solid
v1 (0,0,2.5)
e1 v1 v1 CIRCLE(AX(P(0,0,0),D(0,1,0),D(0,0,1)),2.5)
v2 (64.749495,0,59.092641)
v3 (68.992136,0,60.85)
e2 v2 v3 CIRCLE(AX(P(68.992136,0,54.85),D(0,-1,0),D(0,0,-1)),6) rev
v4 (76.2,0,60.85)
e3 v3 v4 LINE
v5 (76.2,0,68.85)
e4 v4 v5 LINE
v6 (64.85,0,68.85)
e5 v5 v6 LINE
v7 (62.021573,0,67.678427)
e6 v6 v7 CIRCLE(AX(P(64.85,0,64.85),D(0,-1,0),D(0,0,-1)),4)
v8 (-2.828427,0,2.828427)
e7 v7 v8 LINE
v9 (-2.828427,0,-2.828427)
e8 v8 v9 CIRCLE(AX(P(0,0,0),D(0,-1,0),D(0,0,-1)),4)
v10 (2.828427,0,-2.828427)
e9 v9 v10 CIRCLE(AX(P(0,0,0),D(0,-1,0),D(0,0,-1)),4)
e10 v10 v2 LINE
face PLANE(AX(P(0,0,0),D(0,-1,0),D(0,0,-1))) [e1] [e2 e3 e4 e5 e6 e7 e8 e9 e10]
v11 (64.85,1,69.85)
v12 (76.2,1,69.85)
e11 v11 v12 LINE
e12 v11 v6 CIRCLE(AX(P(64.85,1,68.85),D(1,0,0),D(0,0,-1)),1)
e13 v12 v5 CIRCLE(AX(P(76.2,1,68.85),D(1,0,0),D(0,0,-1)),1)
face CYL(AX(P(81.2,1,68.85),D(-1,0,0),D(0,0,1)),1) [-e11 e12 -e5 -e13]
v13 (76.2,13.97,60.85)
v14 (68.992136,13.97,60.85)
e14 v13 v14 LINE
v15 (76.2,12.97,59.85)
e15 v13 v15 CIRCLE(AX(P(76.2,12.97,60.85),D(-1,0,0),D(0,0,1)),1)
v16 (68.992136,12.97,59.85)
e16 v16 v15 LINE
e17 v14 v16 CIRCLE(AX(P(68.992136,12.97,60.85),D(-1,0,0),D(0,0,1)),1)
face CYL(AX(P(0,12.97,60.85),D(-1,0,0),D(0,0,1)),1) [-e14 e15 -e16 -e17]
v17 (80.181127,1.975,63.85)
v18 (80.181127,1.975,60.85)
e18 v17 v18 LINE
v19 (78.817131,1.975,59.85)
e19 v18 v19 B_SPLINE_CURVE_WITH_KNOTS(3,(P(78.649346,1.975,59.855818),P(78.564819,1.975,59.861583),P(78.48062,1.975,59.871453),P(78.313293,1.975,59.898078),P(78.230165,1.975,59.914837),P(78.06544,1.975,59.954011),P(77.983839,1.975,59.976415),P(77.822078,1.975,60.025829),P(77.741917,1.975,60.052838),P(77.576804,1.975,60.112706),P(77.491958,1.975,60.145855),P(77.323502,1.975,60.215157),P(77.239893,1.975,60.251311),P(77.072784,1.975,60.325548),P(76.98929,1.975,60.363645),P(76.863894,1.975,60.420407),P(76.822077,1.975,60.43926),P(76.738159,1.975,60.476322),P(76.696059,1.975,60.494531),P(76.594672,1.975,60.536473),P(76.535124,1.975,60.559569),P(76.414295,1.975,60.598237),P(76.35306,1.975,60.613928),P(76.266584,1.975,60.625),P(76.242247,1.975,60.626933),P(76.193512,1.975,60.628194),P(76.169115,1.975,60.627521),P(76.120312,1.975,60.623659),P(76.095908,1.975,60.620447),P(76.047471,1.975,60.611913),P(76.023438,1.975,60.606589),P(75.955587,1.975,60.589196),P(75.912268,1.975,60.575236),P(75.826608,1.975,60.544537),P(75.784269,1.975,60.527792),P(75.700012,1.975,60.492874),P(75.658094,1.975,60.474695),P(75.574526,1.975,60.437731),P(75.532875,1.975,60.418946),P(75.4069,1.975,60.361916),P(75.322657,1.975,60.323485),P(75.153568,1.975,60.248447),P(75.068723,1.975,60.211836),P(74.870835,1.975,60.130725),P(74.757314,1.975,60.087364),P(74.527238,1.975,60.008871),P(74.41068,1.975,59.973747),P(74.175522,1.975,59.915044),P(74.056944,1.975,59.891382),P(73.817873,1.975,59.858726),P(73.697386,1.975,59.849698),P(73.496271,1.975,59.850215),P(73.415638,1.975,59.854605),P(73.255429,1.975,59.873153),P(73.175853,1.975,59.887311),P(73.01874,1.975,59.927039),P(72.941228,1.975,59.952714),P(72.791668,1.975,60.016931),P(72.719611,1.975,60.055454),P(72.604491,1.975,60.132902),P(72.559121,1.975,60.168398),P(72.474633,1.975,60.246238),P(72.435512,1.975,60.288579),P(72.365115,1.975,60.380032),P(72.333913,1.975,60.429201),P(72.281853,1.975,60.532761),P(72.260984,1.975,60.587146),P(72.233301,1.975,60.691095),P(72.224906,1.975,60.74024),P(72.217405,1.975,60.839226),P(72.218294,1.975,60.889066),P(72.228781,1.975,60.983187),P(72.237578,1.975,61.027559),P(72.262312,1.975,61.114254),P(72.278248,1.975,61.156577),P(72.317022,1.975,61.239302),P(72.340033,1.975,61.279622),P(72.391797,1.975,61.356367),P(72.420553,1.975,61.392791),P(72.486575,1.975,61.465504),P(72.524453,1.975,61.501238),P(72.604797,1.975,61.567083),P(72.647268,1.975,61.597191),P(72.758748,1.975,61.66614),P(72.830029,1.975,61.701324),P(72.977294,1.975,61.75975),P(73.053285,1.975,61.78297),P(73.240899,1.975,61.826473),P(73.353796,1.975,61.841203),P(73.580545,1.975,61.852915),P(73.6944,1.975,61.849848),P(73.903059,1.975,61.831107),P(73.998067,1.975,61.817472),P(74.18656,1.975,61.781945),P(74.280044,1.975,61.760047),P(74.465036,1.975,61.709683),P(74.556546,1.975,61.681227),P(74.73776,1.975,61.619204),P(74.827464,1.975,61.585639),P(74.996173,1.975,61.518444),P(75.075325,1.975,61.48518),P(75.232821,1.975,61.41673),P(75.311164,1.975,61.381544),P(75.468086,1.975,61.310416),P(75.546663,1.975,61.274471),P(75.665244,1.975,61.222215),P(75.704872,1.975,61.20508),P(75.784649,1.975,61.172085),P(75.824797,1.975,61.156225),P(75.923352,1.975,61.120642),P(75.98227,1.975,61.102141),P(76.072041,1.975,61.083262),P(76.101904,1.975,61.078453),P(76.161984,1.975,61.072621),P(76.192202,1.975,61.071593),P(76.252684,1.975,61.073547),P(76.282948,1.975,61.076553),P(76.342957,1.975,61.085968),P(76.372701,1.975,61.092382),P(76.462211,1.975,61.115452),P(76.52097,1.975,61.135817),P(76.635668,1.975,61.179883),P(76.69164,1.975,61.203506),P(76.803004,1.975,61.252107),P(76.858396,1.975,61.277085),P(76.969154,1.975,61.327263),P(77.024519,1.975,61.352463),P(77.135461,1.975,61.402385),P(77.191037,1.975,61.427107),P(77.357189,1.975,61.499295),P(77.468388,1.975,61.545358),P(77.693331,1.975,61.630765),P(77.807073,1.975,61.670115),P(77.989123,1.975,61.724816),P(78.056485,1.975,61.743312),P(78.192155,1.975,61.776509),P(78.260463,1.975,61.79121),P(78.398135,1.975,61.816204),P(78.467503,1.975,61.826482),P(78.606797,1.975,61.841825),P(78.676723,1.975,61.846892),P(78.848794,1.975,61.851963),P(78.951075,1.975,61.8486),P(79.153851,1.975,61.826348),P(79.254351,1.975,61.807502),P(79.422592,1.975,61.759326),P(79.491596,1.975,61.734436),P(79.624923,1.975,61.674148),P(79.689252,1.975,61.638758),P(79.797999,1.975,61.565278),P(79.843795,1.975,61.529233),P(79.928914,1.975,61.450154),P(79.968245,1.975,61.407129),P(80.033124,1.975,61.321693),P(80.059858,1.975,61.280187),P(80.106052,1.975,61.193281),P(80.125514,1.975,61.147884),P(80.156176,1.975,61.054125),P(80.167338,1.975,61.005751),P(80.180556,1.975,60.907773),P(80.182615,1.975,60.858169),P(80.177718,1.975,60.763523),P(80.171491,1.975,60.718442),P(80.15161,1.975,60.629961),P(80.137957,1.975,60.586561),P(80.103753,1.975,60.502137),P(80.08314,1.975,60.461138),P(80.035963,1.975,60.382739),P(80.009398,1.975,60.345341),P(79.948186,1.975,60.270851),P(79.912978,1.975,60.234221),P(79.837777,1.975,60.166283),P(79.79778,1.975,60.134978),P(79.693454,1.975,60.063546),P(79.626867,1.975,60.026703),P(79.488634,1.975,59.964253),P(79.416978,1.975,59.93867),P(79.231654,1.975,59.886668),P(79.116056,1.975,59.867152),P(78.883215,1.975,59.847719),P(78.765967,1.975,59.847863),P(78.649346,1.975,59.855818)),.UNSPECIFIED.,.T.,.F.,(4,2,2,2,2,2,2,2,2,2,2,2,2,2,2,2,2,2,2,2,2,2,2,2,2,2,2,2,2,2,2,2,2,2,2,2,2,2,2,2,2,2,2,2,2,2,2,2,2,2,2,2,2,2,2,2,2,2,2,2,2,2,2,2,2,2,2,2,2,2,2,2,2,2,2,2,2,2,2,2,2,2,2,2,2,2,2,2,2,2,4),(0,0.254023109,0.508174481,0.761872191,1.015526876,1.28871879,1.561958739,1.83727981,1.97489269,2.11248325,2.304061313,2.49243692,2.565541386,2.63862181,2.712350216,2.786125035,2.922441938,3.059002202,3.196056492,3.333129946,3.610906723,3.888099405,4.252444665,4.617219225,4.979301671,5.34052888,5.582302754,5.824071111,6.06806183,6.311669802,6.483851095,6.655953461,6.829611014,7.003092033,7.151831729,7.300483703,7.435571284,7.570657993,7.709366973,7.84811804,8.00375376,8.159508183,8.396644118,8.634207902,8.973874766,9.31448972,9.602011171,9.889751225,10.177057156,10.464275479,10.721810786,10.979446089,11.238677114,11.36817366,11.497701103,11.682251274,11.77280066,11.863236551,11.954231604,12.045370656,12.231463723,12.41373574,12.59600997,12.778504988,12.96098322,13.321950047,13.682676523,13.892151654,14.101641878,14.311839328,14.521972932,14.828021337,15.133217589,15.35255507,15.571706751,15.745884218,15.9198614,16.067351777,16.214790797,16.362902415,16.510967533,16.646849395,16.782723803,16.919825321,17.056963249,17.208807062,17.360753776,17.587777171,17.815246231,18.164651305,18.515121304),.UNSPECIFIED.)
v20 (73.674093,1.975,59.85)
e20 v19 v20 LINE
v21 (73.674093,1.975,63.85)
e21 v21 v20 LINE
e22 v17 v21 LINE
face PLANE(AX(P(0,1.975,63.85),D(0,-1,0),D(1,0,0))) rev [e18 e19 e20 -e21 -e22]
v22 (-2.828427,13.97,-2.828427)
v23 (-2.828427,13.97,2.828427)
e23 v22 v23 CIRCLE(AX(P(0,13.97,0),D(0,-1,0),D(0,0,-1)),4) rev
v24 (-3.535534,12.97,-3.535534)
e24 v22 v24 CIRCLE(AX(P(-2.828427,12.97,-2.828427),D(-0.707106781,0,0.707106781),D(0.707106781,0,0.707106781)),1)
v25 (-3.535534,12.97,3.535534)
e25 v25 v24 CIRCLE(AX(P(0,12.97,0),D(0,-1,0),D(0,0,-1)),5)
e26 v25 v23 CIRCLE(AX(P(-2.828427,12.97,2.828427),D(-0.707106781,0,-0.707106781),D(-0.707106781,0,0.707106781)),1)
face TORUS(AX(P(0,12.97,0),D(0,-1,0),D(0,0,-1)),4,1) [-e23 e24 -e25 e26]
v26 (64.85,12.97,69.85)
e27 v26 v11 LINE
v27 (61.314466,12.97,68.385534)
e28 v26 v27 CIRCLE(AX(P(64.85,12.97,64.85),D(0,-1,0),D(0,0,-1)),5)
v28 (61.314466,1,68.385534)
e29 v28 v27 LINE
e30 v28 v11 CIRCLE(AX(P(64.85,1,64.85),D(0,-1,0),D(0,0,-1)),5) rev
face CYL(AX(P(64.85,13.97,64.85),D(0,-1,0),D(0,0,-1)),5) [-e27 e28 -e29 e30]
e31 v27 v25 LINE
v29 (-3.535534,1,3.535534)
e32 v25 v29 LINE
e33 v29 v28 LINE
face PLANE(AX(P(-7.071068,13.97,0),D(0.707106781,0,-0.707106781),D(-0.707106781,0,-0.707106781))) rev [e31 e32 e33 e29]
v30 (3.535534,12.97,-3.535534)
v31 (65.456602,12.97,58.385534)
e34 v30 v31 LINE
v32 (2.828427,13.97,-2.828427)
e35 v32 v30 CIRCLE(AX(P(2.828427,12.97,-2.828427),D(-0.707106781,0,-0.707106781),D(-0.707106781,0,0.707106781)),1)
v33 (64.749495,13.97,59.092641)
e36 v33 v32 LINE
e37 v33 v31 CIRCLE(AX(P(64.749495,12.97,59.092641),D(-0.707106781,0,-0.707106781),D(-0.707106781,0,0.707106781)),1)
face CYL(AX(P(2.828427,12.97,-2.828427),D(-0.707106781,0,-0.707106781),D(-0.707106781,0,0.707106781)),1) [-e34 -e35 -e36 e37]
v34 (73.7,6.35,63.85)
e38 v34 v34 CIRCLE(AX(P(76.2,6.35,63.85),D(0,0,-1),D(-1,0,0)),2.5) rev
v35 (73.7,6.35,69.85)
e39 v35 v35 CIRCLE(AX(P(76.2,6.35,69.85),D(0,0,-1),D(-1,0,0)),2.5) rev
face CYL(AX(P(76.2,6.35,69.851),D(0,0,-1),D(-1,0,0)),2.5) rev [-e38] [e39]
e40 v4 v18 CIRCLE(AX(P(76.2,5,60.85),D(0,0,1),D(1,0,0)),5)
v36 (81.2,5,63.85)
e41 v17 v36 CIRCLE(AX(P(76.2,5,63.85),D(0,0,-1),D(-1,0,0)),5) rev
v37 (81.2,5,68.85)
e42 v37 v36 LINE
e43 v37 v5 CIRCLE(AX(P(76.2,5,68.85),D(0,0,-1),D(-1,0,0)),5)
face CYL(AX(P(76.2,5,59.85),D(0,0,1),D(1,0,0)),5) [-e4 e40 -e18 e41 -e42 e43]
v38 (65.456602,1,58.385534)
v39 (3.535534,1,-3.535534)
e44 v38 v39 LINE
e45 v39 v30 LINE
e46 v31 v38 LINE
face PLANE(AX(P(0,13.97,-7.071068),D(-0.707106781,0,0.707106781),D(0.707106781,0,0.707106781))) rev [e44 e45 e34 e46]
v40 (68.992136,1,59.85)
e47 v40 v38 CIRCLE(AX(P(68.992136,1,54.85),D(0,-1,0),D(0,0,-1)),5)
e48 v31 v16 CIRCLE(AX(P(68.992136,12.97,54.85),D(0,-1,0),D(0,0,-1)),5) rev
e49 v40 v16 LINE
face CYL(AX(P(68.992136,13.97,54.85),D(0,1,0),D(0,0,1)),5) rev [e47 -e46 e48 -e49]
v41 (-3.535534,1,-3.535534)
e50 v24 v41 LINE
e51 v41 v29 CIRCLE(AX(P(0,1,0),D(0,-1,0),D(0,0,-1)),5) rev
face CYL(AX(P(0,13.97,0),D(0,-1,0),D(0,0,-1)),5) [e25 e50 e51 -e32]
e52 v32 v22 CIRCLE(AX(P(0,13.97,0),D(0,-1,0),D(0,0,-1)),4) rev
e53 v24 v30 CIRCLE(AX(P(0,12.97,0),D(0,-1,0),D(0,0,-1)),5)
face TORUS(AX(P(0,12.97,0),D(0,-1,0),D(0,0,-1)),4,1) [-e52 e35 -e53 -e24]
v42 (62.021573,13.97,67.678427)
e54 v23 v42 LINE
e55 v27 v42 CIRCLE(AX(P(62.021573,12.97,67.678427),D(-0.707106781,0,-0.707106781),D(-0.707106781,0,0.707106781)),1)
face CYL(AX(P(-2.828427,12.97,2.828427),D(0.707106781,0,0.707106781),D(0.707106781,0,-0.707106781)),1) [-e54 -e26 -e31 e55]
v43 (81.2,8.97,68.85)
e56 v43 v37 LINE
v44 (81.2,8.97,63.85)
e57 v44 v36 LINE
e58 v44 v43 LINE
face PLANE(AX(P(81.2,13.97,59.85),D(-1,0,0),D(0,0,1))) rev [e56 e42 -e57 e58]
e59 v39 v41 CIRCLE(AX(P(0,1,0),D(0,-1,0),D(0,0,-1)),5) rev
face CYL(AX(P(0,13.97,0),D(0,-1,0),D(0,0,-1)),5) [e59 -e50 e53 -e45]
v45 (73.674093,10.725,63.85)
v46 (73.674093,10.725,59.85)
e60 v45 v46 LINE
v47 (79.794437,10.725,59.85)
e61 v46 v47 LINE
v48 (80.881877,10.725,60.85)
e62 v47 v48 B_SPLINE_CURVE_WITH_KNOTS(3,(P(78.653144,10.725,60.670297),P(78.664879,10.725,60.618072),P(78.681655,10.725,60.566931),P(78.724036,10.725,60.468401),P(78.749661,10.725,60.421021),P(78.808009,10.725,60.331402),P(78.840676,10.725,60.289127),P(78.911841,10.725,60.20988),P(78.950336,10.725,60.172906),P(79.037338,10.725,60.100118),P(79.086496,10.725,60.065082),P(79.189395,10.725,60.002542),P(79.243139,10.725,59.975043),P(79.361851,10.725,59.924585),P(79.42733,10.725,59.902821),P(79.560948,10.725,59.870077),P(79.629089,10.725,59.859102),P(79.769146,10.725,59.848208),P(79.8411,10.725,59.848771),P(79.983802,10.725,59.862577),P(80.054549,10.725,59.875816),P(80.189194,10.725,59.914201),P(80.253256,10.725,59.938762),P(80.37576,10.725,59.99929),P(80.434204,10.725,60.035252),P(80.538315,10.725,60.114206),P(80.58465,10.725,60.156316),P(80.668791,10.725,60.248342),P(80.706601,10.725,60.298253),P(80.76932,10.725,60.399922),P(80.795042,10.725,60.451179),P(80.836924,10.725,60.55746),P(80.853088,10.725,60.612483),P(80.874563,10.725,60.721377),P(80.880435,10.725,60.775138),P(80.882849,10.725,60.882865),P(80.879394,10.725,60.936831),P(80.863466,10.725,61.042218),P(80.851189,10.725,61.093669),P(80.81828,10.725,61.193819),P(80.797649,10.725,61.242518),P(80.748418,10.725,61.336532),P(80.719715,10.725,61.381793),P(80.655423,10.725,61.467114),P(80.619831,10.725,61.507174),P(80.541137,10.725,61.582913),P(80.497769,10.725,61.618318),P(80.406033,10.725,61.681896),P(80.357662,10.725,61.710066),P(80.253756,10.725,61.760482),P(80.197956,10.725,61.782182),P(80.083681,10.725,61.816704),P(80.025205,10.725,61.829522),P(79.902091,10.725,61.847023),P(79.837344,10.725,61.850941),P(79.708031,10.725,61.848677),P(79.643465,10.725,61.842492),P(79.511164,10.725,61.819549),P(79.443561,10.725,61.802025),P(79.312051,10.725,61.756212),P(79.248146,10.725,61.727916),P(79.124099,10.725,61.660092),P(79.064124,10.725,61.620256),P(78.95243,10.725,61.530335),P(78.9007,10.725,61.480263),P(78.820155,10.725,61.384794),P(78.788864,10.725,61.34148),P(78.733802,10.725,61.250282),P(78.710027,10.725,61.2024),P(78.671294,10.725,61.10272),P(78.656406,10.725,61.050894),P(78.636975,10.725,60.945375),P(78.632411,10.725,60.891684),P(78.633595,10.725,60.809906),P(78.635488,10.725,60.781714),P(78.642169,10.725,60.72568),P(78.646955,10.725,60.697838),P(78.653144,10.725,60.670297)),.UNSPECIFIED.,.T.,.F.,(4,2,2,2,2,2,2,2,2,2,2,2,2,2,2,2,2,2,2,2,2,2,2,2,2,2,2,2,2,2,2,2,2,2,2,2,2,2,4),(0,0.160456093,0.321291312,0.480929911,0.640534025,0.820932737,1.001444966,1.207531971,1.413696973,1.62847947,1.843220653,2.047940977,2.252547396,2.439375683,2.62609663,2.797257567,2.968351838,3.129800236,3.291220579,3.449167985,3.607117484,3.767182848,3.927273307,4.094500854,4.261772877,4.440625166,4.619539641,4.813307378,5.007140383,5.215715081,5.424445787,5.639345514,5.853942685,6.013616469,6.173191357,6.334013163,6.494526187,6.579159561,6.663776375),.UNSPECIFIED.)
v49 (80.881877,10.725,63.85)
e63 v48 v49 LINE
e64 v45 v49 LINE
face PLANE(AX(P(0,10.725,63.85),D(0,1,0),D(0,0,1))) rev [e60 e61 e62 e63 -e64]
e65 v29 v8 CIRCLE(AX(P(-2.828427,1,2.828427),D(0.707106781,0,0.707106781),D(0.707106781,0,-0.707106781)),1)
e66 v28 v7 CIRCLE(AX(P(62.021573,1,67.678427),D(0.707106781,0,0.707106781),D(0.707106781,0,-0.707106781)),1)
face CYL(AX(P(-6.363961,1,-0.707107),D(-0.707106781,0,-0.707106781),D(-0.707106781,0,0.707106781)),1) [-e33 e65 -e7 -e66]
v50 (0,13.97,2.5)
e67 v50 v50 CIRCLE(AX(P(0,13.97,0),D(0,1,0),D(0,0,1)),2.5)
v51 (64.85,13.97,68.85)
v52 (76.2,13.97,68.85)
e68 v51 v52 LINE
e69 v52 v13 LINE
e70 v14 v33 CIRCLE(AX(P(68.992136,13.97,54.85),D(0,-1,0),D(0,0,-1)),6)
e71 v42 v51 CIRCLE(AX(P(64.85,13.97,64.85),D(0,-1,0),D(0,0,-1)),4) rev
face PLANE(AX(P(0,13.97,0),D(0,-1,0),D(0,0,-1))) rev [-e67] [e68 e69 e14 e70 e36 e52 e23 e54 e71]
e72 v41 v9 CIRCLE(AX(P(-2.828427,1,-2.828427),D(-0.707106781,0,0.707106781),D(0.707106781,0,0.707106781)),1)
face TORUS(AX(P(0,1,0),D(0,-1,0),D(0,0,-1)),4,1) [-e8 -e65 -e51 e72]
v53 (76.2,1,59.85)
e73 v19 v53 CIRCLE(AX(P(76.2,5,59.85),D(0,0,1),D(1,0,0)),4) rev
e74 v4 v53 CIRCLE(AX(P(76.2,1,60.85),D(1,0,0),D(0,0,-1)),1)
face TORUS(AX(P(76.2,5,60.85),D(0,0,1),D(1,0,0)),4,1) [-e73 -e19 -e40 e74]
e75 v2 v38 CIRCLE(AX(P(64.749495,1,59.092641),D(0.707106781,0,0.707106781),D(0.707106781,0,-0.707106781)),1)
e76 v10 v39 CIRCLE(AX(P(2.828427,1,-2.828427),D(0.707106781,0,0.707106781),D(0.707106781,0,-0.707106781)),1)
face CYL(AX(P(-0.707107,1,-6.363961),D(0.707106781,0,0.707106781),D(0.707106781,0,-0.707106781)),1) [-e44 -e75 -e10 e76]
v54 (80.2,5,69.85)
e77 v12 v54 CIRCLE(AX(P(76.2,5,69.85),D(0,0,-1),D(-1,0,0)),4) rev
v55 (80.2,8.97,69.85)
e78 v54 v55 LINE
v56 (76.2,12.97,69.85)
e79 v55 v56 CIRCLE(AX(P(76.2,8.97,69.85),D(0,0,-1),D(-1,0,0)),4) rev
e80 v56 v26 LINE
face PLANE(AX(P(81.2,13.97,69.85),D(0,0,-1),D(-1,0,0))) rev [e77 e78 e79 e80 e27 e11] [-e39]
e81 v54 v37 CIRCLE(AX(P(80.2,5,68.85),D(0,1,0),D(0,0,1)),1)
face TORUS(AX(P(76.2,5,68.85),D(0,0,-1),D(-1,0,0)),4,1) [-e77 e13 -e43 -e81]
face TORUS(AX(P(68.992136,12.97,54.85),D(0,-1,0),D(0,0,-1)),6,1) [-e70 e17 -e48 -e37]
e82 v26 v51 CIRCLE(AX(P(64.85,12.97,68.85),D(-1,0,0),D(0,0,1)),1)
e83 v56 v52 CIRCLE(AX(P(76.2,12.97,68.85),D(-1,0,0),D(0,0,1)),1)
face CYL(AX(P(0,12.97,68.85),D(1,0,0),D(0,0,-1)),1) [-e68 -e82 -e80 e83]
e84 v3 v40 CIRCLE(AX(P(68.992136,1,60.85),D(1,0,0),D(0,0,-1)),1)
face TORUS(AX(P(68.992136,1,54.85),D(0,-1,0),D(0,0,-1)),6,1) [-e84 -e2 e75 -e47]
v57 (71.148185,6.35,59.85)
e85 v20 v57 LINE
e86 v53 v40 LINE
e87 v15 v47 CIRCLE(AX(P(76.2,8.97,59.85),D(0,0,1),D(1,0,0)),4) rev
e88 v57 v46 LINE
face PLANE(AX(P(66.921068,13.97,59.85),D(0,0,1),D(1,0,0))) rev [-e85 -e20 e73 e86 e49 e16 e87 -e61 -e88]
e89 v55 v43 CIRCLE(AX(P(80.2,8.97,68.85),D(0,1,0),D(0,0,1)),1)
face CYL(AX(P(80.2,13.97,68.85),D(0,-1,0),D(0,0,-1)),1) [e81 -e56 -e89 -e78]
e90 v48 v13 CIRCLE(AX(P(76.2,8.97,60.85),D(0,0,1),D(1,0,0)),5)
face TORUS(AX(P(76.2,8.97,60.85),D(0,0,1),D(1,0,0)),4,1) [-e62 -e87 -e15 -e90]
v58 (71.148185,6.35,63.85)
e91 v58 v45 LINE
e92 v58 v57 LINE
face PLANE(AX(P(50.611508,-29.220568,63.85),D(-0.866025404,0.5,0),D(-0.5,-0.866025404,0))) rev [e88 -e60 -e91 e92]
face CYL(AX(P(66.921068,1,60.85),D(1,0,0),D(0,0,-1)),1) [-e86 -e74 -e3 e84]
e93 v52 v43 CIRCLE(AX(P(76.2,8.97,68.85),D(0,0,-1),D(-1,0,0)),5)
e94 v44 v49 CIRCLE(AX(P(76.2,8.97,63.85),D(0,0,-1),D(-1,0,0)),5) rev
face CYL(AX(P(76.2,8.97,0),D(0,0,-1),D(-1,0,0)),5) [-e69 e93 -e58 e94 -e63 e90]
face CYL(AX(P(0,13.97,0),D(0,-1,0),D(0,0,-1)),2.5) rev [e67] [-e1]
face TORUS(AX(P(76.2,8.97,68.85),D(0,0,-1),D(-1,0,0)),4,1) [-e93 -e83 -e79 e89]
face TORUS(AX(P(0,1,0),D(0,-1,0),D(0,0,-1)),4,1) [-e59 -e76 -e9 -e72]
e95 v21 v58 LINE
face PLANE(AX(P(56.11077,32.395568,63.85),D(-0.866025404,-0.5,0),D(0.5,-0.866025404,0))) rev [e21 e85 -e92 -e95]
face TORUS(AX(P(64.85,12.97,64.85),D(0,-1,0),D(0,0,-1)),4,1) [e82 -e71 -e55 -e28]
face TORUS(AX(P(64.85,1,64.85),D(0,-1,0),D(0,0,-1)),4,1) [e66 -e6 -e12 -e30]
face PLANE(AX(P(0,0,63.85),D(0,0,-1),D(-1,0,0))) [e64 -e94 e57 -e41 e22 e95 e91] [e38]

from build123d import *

# Parameters (mm, degrees)
SKETCH1_R           = 2.5
BOSS_EXTRUDE1_DEPTH = 13.97
CUT_EXTRUDE1_REACH  = 108.146
SKETCH2_R           = 2.5
FILLET1_R           = 5
FILLET2_R           = 1
SKETCH3_R           = 2.5
CUT_EXTRUDE2_DEPTH  = 4


with BuildPart() as part:
    # Sketch1 → Boss-Extrude1 (new body)
    with BuildSketch(Plane(origin=(0, 0, 0), x_dir=(1, 0, 0), z_dir=(0, 1, 0))):
        Polygon((0, 7.071067812), (-7.071067812, 0), (62.778932188, -69.85), (81.2, -69.85), (81.2, -59.85), (66.921067812, -59.85), align=None)
        with Locations(Location((0, 0, 0), (0, 0, 270))):
            Circle(SKETCH1_R, mode=Mode.SUBTRACT)
    extrude(amount=BOSS_EXTRUDE1_DEPTH)

    # Sketch2 → Cut-Extrude1 (cut, up to next)
    with BuildSketch(Plane(origin=(0, 0, 59.85), x_dir=(-1, 0, 0), z_dir=(0, 0, -1)), mode=Mode.PRIVATE) as cut_extrude1_sk1:
        with Locations((-76.2, 6.35)):
            Circle(SKETCH2_R)
    cut_extrude1_tool1 = extrude(cut_extrude1_sk1.sketch, amount=-CUT_EXTRUDE1_REACH, mode=Mode.PRIVATE) & part.part
    add(cut_extrude1_tool1.solids().sort_by_distance((76.2, 6.35, 59.85))[0], mode=Mode.SUBTRACT)

    # Fillet1
    fillet1_edges = [part.edges().sort_by_distance(p)[0] for p in [
        (-7.071067812, 6.985, 0),
        (0, 6.985, -7.071067812),
        (81.2, 0, 64.85),
        (81.2, 13.97, 64.85),
        (62.778932188, 6.985, 69.85),
        (66.921067812, 6.985, 59.85),
    ]]
    fillet(fillet1_edges, radius=FILLET1_R - 0.0001)  # a hair under: the kernel refuses the full size

    # Fillet2
    fillet2_edges = [part.edges().sort_by_distance(p)[0] for p in [
        (28.889445383, 0, 35.960513195),
        (28.889445383, 13.97, 35.960513195),
        (70.525029289, 0, 69.85),
        (34.496047101, 0, 27.424979289),
        (72.596097101, 0, 59.85),
        (62.936579685, 0, 69.469405275),
        (0, 0, -5.000041421),
        (-5.000041421, 0, 0),
        (72.596097101, 13.97, 59.85),
        (34.496047101, 13.97, 27.424979289),
        (70.525029289, 13.97, 69.85),
        (62.936579685, 13.97, 69.469405275),
        (0, 13.97, -5.000041421),
        (-5.000041421, 13.97, 0),
        (81.2, 6.985, 59.85),
        (81.2, 6.985, 69.85),
        (79.735563195, 12.505563195, 59.85),
        (79.735563195, 1.464436805, 59.85),
        (79.735563195, 12.505563195, 69.85),
        (79.735563195, 1.464436805, 69.85),
        (67.078715309, 0, 59.469405275),
        (67.078715309, 13.97, 59.469405275),
    ]]
    fillet(fillet2_edges, radius=FILLET2_R)

    # Sketch3 → Cut-Extrude2 (cut)
    # profile 1 of 5: a face of its own
    with BuildSketch(Plane(origin=(0, 0, 59.85), x_dir=(-1, 0, 0), z_dir=(0, 0, -1))):
        with BuildLine():
            Line((-80.164228202, 4.466244658), (-78.725907428, 1.975))
            Line((-78.725907428, 1.975), (-73.674092572, 1.975))
            Line((-73.674092572, 1.975), (-71.148185145, 6.35))
            Line((-71.148185145, 6.35), (-73.674092572, 10.725))
            Line((-73.674092572, 10.725), (-78.725907428, 10.725))
            Line((-78.725907428, 10.725), (-80.2, 8.17179677))
            Line((-80.2, 8.17179677), (-80.2, 5))
            ThreePointArc((-80.2, 5), (-80.191047031, 4.732523652), (-80.164228202, 4.466244658))
        make_face()
        with Locations((-76.2, 6.35)):
            Circle(SKETCH3_R, mode=Mode.SUBTRACT)
    # profile 2 of 5: a face of its own
    with BuildSketch(Plane(origin=(0, 0, 59.85), x_dir=(-1, 0, 0), z_dir=(0, 0, -1))):
        with BuildLine():
            Line((-82.608963745, 1.975), (-78.817131063, 1.975))
            ThreePointArc((-78.817131063, 1.975), (-79.718543367, 3.097408985), (-80.164228202, 4.466244658))
            Line((-80.164228202, 4.466244658), (-81.251814855, 6.35))
            Line((-81.251814855, 6.35), (-80.2, 8.17179677))
            Line((-80.2, 8.17179677), (-80.2, 8.97))
            ThreePointArc((-80.2, 8.97), (-80.097290514, 9.870625701), (-79.794436674, 10.725))
            Line((-79.794436674, 10.725), (-82.608963745, 10.725))
            Line((-82.608963745, 10.725), (-82.608963745, 1.975))
        make_face()
    # profile 3 of 5: a face of its own
    with BuildSketch(Plane(origin=(0, 0, 59.85), x_dir=(-1, 0, 0), z_dir=(0, 0, -1))):
        with BuildLine():
            Line((-81.251814855, 6.35), (-80.164228202, 4.466244658))
            ThreePointArc((-80.164228202, 4.466244658), (-80.191047031, 4.732523652), (-80.2, 5))
            Line((-80.2, 5), (-80.2, 8.17179677))
            Line((-80.2, 8.17179677), (-81.251814855, 6.35))
        make_face()
    # profile 4 of 5: a face of its own
    with BuildSketch(Plane(origin=(0, 0, 59.85), x_dir=(-1, 0, 0), z_dir=(0, 0, -1))):
        with BuildLine():
            Line((-80.2, 8.97), (-80.2, 8.17179677))
            Line((-80.2, 8.17179677), (-78.725907428, 10.725))
            Line((-78.725907428, 10.725), (-79.794436674, 10.725))
            ThreePointArc((-79.794436674, 10.725), (-80.097290514, 9.870625701), (-80.2, 8.97))
        make_face()
    # profile 5 of 5: a face of its own
    with BuildSketch(Plane(origin=(0, 0, 59.85), x_dir=(-1, 0, 0), z_dir=(0, 0, -1))):
        with BuildLine():
            Line((-78.817131063, 1.975), (-78.725907428, 1.975))
            Line((-78.725907428, 1.975), (-80.164228202, 4.466244658))
            ThreePointArc((-80.164228202, 4.466244658), (-79.718543367, 3.097408985), (-78.817131063, 1.975))
        make_face()
    extrude(amount=-CUT_EXTRUDE2_DEPTH, mode=Mode.SUBTRACT)


solid = part.part
